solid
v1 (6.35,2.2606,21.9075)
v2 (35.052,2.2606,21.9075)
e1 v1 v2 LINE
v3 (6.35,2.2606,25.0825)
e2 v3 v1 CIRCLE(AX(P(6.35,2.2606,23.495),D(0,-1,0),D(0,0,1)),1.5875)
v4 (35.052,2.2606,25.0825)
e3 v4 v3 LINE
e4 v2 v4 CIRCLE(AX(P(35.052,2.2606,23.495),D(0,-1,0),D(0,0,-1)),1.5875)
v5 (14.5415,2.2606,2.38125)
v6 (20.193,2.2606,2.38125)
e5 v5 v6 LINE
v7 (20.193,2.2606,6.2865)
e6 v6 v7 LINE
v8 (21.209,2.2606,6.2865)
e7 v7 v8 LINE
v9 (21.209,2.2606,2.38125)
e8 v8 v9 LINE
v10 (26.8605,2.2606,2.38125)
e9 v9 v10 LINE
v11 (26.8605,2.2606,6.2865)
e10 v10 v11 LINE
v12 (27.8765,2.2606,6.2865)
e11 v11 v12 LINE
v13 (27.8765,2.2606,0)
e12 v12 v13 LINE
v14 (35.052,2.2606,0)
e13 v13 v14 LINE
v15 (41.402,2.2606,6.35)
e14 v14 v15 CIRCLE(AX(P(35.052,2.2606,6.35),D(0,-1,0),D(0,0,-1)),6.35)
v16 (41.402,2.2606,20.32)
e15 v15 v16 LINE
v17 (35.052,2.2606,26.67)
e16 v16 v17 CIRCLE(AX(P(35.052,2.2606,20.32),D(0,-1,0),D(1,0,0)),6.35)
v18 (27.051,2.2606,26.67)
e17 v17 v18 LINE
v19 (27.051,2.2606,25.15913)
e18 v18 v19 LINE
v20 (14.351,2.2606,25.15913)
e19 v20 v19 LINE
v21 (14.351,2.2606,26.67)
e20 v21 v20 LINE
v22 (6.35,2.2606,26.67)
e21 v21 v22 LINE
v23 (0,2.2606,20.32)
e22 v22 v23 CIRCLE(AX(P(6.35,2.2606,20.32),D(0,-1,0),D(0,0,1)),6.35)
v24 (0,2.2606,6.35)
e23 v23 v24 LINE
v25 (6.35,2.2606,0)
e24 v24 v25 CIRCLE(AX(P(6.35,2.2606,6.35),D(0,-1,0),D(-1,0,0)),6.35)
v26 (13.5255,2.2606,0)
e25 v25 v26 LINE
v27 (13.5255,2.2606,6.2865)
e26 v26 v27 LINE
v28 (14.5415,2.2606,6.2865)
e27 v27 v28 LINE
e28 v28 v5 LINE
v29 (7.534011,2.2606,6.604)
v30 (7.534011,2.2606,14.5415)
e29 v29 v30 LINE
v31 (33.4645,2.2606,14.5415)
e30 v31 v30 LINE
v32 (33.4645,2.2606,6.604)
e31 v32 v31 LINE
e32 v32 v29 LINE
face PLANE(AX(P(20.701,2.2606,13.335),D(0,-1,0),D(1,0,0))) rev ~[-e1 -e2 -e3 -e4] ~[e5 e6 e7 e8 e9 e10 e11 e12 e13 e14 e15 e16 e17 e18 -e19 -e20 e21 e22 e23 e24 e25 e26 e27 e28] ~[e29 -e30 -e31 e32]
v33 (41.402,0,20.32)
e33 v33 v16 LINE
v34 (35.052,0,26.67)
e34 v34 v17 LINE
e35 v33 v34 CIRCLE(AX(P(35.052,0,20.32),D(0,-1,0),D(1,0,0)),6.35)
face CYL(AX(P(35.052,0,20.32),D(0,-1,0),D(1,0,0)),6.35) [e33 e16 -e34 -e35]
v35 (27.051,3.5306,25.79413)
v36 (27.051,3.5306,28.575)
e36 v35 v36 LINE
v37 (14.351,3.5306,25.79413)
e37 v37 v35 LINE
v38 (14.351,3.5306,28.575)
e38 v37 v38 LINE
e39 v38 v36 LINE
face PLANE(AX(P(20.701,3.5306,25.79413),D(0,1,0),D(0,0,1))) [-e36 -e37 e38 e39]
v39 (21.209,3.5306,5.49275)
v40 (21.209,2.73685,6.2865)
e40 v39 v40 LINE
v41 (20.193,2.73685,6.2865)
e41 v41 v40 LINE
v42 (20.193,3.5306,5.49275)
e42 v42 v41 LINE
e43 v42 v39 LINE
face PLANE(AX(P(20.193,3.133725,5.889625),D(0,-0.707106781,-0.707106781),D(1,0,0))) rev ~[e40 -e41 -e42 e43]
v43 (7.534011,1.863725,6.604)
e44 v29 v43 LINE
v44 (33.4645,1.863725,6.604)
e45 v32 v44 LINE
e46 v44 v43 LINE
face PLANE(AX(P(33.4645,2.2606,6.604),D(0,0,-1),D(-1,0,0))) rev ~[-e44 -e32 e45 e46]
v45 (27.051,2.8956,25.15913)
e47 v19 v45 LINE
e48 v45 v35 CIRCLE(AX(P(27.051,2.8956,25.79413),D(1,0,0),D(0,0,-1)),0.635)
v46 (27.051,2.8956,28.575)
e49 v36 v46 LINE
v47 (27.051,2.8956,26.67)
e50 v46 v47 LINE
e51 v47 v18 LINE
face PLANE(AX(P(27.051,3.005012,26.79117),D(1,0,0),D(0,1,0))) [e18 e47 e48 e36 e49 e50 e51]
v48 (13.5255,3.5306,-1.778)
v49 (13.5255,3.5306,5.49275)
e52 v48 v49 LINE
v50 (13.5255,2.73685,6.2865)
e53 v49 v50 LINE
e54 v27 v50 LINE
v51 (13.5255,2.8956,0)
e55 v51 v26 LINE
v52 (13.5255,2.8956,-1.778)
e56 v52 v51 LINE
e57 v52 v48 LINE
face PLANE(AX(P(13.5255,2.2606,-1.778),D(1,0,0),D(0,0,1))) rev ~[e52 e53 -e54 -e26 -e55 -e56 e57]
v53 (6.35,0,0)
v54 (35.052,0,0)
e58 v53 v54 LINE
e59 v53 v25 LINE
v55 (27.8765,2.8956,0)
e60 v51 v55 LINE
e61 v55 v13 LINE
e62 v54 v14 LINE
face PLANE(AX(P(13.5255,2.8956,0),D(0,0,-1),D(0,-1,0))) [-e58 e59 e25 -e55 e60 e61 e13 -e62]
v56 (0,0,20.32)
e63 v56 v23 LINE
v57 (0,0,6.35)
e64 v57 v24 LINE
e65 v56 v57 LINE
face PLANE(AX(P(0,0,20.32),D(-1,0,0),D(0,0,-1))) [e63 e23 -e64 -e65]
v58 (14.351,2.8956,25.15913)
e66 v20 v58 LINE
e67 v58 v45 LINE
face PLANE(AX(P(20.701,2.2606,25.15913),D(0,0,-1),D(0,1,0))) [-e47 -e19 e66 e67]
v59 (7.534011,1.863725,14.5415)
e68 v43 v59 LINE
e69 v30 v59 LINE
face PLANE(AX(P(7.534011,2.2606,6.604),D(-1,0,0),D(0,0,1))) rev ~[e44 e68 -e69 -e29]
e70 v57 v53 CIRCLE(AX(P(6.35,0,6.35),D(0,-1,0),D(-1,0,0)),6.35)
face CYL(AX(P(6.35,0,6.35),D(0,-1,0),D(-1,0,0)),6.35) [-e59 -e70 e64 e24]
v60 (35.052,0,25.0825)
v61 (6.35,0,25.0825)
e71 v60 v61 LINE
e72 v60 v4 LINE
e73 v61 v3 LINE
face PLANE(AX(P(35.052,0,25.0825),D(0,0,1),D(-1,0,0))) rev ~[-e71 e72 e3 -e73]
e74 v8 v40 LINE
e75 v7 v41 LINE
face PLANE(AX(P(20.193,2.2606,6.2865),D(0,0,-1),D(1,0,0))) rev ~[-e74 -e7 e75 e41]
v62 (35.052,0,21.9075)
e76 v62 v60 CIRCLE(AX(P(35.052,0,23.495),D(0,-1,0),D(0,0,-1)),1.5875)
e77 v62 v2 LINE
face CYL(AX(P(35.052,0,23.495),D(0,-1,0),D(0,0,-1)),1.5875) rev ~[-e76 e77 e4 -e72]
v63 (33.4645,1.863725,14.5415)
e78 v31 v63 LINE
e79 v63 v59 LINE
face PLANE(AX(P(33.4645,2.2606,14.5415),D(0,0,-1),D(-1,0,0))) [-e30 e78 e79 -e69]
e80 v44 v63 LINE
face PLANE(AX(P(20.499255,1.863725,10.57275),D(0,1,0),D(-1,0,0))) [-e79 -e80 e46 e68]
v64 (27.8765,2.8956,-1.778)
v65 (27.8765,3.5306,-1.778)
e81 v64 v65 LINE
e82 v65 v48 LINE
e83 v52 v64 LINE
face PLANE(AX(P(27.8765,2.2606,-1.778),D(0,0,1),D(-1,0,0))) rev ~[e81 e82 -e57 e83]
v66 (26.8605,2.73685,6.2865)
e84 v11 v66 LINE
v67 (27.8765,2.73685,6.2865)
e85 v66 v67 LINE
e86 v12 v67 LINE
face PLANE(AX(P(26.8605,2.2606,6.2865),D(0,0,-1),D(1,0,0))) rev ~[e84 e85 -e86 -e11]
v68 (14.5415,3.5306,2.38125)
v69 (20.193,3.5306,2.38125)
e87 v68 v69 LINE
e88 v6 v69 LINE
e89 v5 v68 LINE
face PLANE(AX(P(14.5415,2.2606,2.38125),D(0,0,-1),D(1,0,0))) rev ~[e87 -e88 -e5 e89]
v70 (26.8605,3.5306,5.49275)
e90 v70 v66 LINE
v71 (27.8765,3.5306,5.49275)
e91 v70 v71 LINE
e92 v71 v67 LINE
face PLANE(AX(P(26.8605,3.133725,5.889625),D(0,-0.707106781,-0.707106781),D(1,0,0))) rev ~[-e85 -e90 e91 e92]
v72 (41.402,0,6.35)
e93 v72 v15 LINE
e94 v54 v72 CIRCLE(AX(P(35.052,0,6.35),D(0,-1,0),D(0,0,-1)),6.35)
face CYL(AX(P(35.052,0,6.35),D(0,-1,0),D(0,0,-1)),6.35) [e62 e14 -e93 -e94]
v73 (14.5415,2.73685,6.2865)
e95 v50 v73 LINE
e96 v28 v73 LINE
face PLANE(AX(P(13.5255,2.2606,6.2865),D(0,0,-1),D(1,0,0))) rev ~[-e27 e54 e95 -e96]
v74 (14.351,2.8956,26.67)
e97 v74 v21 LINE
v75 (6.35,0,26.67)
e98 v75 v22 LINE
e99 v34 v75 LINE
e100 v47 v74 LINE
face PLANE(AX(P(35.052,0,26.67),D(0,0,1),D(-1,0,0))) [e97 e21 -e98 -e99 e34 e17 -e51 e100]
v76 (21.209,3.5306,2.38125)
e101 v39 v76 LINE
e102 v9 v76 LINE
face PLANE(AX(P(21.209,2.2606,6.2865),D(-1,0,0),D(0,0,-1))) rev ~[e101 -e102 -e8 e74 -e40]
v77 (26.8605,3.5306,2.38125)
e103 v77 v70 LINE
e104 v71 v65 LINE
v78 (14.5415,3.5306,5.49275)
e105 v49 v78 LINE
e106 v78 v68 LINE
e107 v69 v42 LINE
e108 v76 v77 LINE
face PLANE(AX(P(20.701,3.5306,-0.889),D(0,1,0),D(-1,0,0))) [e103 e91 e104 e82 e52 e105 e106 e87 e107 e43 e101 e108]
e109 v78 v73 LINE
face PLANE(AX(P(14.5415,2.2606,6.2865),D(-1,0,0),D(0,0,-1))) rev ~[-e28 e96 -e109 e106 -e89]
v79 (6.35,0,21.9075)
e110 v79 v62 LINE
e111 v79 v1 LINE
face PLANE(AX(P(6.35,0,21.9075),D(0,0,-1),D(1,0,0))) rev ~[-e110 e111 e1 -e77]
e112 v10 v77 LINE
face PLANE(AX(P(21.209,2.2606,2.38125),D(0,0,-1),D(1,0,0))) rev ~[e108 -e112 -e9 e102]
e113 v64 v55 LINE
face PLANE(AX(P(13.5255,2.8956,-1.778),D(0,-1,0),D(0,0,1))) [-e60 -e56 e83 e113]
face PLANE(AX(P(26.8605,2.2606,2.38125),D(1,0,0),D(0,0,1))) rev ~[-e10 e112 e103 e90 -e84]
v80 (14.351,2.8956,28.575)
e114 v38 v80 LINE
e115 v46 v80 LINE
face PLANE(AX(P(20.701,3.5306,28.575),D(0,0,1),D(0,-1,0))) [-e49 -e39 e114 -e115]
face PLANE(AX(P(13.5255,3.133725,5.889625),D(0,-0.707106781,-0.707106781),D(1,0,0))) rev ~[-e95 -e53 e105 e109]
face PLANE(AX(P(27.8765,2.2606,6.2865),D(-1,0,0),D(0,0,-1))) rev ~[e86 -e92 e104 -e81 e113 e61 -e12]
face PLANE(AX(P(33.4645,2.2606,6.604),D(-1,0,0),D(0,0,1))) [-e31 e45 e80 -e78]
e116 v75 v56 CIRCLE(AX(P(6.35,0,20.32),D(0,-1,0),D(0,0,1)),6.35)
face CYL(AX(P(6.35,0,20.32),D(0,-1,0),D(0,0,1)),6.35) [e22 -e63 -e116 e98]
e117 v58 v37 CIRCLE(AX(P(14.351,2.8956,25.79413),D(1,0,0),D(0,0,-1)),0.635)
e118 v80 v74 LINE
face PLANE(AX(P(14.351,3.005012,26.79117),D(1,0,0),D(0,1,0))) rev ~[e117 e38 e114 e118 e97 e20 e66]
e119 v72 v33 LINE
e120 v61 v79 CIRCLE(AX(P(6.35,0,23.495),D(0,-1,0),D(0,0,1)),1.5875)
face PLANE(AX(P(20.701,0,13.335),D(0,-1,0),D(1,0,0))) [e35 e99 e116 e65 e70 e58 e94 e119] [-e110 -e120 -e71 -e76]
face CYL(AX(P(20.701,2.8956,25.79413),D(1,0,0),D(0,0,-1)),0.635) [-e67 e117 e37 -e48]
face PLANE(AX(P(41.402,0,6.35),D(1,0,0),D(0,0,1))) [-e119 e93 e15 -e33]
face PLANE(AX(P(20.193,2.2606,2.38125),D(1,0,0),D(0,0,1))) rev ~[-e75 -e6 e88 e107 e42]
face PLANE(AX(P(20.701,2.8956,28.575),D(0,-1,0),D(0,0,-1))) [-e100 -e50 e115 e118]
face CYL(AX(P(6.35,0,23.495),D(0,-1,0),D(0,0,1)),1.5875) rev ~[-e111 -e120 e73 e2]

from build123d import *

# Parameters (mm, degrees)
F1_DEPTH  = 2.2606
F2_W      = 25.9304894134
F2_H      = 7.9375
F3_DEPTH  = 0.396875
F4_W      = 14.351
F4_H      = 1.778
F5_DEPTH  = 1.27
F6_SIZE   = 0.79375
F10_DEPTH = 2.2606
F12_DEPTH = 6.35
F13_W     = 0.635
F13_H     = 1.778
F14_DEPTH = 27.8775


# Not quite as in the source:
# - a feature names something its author has since deleted; it is built from what else it names


with BuildPart() as f1:
    # F0 (on Front) → F1 (new body)
    with BuildSketch(Plane.XZ):
        with BuildLine():
            ThreePointArc((0, 6.35), (1.8598719395, 1.8598719395), (6.35, 0))
            Line((6.35, 0), (35.052, 0))
            ThreePointArc((35.052, 0), (39.5421280605, 1.8598719395), (41.402, 6.35))
            Line((41.402, 6.35), (41.402, 20.32))
            ThreePointArc((41.402, 20.32), (39.5421280605, 24.8101280605), (35.052, 26.67))
            Line((35.052, 26.67), (6.35, 26.67))
            ThreePointArc((6.35, 26.67), (1.8598719395, 24.8101280605), (0, 20.32))
            Line((0, 20.32), (0, 6.35))
        make_face()
    extrude(amount=-F1_DEPTH)

    # F2 (on face) → F3 (cut)
    with BuildSketch(Plane(origin=(0, 2.2606, 0), x_dir=(-1, 0, 0), z_dir=(0, 1, 0))):
        with Locations((-20.4992552933, 10.57275)):
            Rectangle(F2_W, F2_H)
    extrude(amount=-F3_DEPTH, mode=Mode.SUBTRACT)

    # F4 (on face) → F5 (join)
    with BuildSketch(Plane(origin=(0, 2.2606, 0), x_dir=(-1, 0, 0), z_dir=(0, 1, 0))):
        with Locations((-20.701, -0.889)):
            Rectangle(F4_W, F4_H)
        Polygon((-21.209, 2.38125), (-26.8605, 2.38125), (-26.8605, 6.2865), (-27.8765, 6.2865), (-27.8765, 0), (-13.5255, 0), (-13.5255, 6.2865), (-14.5415, 6.2865), (-14.5415, 2.38125), (-20.193, 2.38125), (-20.193, 6.2865), (-21.209, 6.2865), align=None)
    extrude(amount=F5_DEPTH)

    # F6
    f6_edges = [f1.edges().sort_by_distance(p)[0] for p in [
        (27.3685, 3.5306, 6.2865),
        (20.701, 3.5306, 6.2865),
        (14.0335, 3.5306, 6.2865),
    ]]
    chamfer(f6_edges, length=F6_SIZE)

    # F9 (on Front) → F10 (cut, through all)
    with BuildSketch(Plane.XZ):
        with BuildLine():
            Line((6.35, 21.9075), (35.052, 21.9075))
            ThreePointArc((35.052, 21.9075), (36.6395, 23.495), (35.052, 25.0825))
            Line((35.052, 25.0825), (6.35, 25.0825))
            ThreePointArc((6.35, 25.0825), (4.7625, 23.495), (6.35, 21.9075))
        make_face()
    extrude(amount=-F10_DEPTH, mode=Mode.SUBTRACT)

    # F11 (on face) → F12 (join, symmetric)
    with BuildSketch(Plane.YZ.offset(20.701)):
        with BuildLine():
            Line((2.2606, 26.67), (2.2606, 25.1591298729))
            Line((2.2606, 25.1591298729), (2.8956, 25.1591298729))
            ThreePointArc((2.8956, 25.1591298729), (3.3446128061, 25.3451170669), (3.5306, 25.7941298729))
            Line((3.5306, 25.7941298729), (3.5306, 26.67))
            Line((3.5306, 26.67), (3.5306, 28.575))
            Line((3.5306, 28.575), (2.8956, 28.575))
            Line((2.8956, 28.575), (2.8956, 26.67))
            Line((2.8956, 26.67), (2.2606, 26.67))
        make_face()
    extrude(amount=F12_DEPTH, both=True)

    # F13 (on face) → F14 (cut, through all)
    with BuildSketch(Plane(origin=(13.5255, 0, 0), x_dir=(0, -1, 0), z_dir=(-1, 0, 0))):
        with Locations((-2.5781, -0.889)):
            Rectangle(F13_W, F13_H)
    extrude(amount=-F14_DEPTH, mode=Mode.SUBTRACT)


solid = f1.part
